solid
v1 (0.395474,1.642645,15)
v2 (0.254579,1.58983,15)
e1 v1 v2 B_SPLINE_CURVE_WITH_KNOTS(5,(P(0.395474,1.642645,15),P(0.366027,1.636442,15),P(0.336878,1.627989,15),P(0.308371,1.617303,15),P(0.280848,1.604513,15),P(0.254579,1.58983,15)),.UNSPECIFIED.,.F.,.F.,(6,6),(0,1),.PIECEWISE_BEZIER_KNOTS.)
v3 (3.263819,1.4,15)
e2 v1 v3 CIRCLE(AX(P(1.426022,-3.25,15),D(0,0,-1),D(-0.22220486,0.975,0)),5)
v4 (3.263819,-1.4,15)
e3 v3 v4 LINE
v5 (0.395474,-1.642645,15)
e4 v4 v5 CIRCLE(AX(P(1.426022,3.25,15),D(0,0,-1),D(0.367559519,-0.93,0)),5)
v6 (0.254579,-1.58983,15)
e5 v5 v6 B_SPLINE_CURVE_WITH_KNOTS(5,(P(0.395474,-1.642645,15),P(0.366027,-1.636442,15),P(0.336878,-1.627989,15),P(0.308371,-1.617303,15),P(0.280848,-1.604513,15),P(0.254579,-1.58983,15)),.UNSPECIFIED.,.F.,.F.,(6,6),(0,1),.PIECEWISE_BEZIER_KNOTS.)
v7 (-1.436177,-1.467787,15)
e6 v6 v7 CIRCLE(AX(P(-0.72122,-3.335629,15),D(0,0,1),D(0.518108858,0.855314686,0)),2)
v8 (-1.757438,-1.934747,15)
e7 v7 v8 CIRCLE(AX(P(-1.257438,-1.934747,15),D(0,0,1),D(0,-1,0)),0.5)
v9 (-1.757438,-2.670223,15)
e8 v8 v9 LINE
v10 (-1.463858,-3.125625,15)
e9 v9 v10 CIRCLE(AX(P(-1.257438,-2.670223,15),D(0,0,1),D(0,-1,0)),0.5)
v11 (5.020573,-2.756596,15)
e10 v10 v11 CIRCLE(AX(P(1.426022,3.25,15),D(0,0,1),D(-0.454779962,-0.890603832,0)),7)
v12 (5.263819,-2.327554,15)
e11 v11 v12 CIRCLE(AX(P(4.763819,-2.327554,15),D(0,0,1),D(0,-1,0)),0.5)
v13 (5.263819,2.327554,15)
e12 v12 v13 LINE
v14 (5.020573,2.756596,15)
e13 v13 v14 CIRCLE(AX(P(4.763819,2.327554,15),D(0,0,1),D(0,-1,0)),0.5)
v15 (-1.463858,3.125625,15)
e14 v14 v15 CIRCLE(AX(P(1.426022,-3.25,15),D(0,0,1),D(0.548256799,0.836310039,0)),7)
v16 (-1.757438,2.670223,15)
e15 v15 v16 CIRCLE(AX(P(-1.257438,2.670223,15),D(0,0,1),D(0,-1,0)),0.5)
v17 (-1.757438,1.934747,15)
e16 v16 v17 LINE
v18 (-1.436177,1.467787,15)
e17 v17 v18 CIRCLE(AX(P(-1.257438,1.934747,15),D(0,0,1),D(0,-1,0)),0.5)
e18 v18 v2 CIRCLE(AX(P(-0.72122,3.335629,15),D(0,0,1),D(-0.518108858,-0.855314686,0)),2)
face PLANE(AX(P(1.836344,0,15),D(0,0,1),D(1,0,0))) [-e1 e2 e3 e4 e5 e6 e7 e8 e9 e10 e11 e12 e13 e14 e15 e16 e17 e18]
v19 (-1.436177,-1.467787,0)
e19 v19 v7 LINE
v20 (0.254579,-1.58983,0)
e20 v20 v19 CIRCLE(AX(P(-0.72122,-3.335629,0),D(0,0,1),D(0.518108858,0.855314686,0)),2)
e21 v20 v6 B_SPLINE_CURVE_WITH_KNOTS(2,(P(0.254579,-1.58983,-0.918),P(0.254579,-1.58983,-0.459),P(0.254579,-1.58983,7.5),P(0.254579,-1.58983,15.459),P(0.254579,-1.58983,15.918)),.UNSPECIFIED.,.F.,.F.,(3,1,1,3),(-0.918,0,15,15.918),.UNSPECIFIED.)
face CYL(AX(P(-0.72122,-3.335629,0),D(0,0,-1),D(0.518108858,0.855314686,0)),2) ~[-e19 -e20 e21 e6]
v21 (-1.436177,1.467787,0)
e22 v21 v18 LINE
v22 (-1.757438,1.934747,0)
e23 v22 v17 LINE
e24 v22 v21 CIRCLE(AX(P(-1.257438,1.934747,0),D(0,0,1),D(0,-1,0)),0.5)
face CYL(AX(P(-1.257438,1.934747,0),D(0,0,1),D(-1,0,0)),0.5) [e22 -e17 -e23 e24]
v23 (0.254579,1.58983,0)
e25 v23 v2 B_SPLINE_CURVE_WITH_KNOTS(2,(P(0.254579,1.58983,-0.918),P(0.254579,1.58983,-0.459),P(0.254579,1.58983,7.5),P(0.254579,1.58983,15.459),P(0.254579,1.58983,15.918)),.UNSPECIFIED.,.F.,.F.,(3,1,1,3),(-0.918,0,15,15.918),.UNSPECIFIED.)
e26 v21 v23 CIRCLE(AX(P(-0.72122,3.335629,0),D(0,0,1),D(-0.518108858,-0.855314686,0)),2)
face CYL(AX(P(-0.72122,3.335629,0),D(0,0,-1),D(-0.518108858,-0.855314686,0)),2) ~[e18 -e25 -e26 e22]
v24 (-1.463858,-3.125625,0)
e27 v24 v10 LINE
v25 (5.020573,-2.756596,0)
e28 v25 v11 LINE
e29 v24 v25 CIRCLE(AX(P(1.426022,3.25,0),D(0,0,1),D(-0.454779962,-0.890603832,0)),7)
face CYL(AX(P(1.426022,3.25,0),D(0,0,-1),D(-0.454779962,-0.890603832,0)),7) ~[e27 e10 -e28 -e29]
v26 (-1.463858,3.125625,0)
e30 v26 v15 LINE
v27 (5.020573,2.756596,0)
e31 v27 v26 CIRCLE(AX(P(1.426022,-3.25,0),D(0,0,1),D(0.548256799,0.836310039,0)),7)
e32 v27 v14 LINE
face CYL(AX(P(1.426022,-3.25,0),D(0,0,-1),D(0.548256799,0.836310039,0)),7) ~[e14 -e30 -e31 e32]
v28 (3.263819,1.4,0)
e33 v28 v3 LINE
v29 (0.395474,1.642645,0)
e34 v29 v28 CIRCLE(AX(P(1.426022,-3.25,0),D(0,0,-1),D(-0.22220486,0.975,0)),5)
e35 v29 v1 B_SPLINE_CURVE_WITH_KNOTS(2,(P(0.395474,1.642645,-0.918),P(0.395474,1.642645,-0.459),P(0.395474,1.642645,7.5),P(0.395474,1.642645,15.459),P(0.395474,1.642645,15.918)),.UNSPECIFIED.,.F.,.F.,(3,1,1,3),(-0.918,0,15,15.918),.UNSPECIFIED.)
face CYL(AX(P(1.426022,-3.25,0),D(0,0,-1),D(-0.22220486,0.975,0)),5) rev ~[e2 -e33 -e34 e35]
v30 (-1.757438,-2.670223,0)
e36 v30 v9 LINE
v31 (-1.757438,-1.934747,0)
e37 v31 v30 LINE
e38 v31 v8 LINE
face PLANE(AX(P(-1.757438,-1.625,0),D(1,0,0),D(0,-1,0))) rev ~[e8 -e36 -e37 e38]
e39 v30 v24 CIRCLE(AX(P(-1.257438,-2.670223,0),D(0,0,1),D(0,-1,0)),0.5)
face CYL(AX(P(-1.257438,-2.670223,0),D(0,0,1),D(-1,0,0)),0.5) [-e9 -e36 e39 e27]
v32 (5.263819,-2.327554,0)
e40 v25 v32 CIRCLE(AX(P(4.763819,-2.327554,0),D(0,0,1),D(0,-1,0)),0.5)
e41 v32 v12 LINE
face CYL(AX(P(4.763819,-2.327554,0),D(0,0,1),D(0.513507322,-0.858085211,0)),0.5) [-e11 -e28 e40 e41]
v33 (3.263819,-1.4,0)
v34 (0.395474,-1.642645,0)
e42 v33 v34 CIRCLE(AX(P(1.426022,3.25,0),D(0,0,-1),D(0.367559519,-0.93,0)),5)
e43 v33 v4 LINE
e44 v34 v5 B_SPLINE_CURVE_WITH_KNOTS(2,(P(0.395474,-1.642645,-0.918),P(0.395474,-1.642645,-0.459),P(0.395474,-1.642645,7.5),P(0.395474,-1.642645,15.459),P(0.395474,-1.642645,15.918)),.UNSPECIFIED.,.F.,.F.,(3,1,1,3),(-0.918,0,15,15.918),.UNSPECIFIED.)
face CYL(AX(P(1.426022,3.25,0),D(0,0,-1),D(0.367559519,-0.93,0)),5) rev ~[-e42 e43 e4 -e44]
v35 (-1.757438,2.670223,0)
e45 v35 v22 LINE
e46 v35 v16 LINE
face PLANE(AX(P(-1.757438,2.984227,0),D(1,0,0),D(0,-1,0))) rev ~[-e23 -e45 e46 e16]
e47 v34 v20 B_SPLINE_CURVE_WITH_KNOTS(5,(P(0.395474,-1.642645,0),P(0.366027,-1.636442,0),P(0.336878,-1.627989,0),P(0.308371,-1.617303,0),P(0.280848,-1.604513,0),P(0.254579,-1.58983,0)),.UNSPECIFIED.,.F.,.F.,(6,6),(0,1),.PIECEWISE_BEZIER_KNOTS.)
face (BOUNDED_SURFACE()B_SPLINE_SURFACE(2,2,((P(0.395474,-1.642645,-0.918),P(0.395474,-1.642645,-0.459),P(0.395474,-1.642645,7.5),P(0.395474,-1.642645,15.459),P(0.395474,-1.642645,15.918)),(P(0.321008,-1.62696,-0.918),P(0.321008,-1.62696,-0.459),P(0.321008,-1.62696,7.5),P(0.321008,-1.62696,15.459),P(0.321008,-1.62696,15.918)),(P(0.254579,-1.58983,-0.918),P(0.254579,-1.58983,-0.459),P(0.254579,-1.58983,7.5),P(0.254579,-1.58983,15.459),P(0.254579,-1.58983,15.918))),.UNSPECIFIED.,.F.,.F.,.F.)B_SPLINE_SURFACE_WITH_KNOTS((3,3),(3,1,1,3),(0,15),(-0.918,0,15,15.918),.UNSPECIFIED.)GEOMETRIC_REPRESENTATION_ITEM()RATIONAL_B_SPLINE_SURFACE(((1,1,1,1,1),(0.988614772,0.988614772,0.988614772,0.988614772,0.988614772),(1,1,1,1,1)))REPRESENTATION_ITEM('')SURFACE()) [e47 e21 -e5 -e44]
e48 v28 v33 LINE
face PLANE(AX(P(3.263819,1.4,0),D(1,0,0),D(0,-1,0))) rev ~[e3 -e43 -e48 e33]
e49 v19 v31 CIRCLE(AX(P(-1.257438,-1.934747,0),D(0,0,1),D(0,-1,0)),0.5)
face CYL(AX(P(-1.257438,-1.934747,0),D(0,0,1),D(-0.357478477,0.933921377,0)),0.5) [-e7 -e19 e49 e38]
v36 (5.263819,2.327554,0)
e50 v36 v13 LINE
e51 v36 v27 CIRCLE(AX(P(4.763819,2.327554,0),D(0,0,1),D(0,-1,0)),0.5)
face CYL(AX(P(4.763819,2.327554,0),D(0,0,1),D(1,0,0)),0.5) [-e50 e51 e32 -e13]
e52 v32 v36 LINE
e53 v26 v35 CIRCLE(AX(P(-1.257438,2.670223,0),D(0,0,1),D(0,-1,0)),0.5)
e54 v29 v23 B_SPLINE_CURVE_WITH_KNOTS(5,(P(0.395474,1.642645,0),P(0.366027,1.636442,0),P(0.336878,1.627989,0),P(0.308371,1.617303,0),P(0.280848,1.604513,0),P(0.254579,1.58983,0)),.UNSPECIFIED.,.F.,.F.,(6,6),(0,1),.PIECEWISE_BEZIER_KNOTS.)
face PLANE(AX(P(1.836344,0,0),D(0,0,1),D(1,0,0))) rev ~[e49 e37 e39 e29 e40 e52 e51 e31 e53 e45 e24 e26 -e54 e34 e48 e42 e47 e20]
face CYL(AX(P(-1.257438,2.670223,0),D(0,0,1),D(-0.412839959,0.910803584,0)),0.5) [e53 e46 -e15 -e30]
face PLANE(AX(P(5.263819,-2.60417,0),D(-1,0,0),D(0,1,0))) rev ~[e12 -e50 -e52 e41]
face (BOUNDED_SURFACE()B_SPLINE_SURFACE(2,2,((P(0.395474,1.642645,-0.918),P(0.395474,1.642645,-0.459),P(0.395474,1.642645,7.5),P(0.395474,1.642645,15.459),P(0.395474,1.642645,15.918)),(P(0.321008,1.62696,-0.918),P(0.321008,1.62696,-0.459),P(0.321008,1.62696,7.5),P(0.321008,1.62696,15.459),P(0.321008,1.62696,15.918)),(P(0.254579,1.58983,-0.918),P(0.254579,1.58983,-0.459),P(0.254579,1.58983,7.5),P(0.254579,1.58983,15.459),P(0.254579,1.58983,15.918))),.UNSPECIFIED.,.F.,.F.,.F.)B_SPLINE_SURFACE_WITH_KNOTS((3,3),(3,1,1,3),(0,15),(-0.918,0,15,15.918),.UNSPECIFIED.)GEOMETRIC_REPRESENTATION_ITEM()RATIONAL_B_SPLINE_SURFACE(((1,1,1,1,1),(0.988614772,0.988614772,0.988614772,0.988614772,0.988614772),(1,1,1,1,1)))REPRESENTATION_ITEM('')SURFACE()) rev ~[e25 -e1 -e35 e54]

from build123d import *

# Parameters (mm, degrees)
F1_DEPTH = 15
F2_R     = 0.5


with BuildPart() as f1:
    # F0 (on Top) → F1 (new body)
    with BuildSketch(Plane.XY):
        with BuildLine():
            ThreePointArc((0.314997359, 1.625), (1.8064242174, 1.7355083888), (3.2638192562, 1.4))
            Line((3.2638192562, 1.4), (3.2638192562, -1.4))
            ThreePointArc((3.2638192562, -1.4), (1.8064242174, -1.7355083888), (0.314997359, -1.625))
            ThreePointArc((0.314997359, -1.625), (-0.7212203567, -1.3356293712), (-1.7574380725, -1.625))
            Line((-1.7574380725, -1.625), (-1.7574380725, -2.9842268265))
            ThreePointArc((-1.7574380725, -2.9842268265), (1.8043736859, -3.739767503), (5.2638192562, -2.604170276))
            Line((5.2638192562, -2.604170276), (5.2638192562, 2.604170276))
            ThreePointArc((5.2638192562, 2.604170276), (1.8043736859, 3.739767503), (-1.7574380725, 2.9842268265))
            Line((-1.7574380725, 2.9842268265), (-1.7574380725, 1.625))
            ThreePointArc((-1.7574380725, 1.625), (-0.7212203567, 1.3356293712), (0.314997359, 1.625))
        make_face()
    extrude(amount=F1_DEPTH)

    # F2
    f2_edges = [f1.edges().sort_by_distance(p)[0] for p in [
        (0.314997, 1.625, 7.5),
        (0.314997, -1.625, 7.5),
        (-1.757438, -1.625, 7.5),
        (-1.757438, -2.984227, 7.5),
        (5.263819, -2.60417, 7.5),
        (5.263819, 2.60417, 7.5),
        (-1.757438, 2.984227, 7.5),
        (-1.757438, 1.625, 7.5),
    ]]
    fillet(f2_edges, radius=F2_R)


solid = f1.part
